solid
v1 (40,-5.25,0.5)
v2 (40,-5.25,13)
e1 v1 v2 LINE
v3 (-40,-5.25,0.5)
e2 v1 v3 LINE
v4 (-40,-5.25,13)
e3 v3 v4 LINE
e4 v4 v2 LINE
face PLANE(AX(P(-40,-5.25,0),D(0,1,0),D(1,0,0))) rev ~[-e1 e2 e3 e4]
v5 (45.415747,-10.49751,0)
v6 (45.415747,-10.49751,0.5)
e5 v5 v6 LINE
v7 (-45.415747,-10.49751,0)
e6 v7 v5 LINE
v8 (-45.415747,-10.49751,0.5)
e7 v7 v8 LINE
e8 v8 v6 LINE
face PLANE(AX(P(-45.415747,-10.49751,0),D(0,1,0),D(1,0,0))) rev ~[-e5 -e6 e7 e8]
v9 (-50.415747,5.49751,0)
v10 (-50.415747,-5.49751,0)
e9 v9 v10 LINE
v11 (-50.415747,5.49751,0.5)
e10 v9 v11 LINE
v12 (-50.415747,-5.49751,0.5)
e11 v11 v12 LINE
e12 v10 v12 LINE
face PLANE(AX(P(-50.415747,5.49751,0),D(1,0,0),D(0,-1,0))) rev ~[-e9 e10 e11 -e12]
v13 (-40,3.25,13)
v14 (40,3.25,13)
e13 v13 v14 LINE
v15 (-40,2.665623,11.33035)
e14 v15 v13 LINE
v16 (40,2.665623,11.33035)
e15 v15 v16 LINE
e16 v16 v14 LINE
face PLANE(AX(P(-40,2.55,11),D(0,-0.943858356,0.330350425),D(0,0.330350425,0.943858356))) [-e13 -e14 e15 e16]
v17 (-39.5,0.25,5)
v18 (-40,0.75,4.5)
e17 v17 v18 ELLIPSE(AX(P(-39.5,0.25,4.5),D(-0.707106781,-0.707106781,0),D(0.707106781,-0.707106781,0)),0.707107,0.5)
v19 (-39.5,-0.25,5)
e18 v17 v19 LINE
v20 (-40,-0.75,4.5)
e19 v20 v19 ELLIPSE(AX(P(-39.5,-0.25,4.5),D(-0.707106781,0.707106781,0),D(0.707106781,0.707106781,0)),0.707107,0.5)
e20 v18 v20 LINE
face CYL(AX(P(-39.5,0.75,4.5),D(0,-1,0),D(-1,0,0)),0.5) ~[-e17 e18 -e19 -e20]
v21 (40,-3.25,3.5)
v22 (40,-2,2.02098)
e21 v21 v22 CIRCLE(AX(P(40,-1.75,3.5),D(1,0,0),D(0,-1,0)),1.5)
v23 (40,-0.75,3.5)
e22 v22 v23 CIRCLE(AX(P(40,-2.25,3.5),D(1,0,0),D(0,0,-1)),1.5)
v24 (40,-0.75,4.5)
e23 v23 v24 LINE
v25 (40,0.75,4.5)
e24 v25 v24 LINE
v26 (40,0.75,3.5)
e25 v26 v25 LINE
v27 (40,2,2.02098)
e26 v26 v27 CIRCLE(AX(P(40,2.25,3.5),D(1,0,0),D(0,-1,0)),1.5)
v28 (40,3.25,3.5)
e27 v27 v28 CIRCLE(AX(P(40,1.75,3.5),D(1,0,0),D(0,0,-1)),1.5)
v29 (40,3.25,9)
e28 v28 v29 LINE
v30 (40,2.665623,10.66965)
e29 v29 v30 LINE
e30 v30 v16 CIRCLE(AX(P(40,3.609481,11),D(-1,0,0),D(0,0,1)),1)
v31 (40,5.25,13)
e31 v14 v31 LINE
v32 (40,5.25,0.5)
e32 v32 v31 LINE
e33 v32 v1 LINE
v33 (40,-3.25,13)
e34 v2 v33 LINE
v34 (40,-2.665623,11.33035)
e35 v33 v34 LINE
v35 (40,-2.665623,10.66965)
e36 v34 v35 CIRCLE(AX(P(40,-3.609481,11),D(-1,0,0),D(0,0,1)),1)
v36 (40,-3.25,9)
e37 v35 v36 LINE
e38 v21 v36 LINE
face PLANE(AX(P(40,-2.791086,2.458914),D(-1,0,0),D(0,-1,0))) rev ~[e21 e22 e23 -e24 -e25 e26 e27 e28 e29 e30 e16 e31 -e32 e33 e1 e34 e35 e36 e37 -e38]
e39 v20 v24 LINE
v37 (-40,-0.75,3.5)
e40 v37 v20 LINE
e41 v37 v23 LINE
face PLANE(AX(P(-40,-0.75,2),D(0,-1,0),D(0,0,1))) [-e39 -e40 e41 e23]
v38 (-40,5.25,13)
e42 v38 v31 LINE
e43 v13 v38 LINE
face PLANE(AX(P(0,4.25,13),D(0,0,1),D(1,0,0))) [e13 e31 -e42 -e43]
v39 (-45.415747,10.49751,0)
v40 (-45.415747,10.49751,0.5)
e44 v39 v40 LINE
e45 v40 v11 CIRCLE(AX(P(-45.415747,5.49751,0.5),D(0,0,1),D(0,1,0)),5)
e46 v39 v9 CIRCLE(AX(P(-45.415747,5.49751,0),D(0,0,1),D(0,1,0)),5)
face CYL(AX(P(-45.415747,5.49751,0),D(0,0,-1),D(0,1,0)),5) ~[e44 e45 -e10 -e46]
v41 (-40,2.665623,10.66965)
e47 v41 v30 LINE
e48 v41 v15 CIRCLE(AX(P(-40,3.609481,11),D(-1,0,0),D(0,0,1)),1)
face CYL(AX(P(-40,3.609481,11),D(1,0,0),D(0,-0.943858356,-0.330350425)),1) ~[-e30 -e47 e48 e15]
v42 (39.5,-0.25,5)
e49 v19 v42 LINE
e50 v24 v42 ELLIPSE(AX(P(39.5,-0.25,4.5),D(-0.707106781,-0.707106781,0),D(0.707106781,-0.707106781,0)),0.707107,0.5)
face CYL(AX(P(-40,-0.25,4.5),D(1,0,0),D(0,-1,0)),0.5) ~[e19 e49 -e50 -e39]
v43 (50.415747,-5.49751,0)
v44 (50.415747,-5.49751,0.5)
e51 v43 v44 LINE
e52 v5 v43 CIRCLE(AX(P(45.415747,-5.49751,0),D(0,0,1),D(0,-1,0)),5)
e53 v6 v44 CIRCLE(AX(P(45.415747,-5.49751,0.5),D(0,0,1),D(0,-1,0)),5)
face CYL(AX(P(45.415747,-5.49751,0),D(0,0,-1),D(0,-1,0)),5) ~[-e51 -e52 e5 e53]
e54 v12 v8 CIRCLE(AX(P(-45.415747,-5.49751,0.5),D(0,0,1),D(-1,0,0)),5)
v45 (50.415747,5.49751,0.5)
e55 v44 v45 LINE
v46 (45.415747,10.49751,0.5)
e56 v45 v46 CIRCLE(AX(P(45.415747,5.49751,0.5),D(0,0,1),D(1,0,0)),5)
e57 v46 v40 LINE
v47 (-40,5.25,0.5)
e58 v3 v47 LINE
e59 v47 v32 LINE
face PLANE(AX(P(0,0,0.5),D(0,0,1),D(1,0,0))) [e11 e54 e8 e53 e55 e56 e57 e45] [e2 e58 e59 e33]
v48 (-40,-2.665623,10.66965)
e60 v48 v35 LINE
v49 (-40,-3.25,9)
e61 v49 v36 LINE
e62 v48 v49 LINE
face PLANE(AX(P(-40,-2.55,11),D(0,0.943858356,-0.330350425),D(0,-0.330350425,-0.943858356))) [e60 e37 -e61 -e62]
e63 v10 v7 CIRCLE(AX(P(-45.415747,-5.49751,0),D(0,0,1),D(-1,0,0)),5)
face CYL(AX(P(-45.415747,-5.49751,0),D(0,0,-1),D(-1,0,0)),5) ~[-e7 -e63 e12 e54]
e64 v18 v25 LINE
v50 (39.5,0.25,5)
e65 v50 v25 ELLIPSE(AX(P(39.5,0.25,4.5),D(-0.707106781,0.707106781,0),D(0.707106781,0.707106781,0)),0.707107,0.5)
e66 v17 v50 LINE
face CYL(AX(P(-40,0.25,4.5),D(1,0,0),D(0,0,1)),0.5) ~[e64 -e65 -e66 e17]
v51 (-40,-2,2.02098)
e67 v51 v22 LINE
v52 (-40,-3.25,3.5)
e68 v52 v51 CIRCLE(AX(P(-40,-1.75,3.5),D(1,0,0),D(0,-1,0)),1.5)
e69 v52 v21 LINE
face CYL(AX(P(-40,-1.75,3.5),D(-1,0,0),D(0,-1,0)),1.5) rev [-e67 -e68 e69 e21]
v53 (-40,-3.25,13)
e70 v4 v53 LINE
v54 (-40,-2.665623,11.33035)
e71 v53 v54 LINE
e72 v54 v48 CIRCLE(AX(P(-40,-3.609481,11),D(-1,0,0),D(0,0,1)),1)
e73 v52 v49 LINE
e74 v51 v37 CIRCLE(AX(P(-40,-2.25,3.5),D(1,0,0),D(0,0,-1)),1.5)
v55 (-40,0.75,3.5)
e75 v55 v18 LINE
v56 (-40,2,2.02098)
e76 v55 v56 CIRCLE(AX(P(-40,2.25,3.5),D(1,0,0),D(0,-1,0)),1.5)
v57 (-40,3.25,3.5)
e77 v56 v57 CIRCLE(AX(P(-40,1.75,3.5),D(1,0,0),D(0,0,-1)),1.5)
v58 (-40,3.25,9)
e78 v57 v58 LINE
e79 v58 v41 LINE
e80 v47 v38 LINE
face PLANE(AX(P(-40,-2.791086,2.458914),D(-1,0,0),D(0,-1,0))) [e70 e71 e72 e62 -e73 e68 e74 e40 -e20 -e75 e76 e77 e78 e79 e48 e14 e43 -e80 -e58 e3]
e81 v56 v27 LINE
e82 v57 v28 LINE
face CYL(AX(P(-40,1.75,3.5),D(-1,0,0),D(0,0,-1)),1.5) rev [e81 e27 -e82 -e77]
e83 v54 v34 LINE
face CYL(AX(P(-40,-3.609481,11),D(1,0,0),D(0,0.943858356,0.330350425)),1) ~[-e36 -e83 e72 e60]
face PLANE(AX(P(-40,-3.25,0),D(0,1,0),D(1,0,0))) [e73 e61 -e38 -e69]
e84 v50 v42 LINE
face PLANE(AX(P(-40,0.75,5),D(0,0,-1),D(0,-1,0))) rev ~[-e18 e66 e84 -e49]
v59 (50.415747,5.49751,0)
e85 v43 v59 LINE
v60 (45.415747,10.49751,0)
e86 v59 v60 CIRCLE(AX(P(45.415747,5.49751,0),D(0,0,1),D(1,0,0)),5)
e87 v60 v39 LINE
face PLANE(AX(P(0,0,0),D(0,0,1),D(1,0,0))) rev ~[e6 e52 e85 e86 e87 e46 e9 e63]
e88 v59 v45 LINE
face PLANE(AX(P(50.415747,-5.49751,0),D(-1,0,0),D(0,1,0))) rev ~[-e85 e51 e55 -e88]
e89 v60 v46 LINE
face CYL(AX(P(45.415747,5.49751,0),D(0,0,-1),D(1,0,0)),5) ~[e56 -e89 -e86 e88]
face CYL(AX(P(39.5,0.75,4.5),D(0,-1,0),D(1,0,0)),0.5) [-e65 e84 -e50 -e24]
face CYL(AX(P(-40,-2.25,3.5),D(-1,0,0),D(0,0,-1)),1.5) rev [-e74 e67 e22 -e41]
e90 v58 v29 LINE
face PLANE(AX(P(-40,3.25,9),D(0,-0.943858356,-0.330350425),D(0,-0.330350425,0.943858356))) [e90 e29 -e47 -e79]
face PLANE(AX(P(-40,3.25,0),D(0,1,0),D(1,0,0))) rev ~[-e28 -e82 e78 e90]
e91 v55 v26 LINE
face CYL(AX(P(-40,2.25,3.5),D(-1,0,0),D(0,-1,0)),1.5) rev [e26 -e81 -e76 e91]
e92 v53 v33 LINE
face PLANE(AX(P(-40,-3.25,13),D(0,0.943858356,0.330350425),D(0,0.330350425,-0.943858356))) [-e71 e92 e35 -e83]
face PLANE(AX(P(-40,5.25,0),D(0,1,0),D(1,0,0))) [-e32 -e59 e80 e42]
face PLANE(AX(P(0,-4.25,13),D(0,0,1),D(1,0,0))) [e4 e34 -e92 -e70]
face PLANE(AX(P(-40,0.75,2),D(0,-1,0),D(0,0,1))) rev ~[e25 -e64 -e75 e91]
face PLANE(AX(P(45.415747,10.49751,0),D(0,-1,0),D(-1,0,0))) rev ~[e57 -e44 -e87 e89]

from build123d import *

# Parameters (mm, degrees)
F0_W        = 80
F0_H        = 6.5
F1_DEPTH    = 2
F0_H_2      = 2
F2_DEPTH    = 13
F3_W        = 1.5
F3_H        = 3
F4_DEPTH    = 80
F5_R        = 1
F6_R        = 1
F7_T1_DEPTH = 80
F8_R        = 0.5
F9_DEPTH    = 0.5


# Not quite as in the source:
# - a fillet or chamfer that OpenCascade refuses, or shapes differently, is made with other operations: its cross-section is extruded or revolved along the edge and cut away or added
# - a feature names something its author has since deleted; it is built from what else it names


with BuildPart() as f1:
    # F0 (on Top) → F1 (new body)
    with BuildSketch(Plane.XY):
        Rectangle(F0_W, F0_H)
    extrude(amount=F1_DEPTH)

    # F0 (on Top) → F2 (join)
    with BuildSketch(Plane.XY):
        with Locations((0, 4.25)):
            Rectangle(F0_W, F0_H_2)
        with Locations((0, -4.25)):
            Rectangle(F0_W, F0_H_2)
    extrude(amount=F2_DEPTH)

    # F3 (on face) → F4 (join)
    with BuildSketch(Plane(origin=(-40, 0, 0), x_dir=(0, -1, 0), z_dir=(-1, 0, 0))):
        Polygon((-3.25, 13), (-3.25, 9), (-2.55, 11), align=None)
        Polygon((2.55, 11), (3.25, 9), (3.25, 13), align=None)
        with Locations((0, 3.5)):
            Rectangle(F3_W, F3_H)
    extrude(amount=-F4_DEPTH)

    # F5
    f5_edges = [f1.edges().sort_by_distance(p)[0] for p in [
        (0, 2.55, 11),
    ]]
    fillet(f5_edges, radius=F5_R)

    # F6
    f6_edges = [f1.edges().sort_by_distance(p)[0] for p in [
        (0, -2.55, 11),
    ]]
    fillet(f6_edges, radius=F6_R)

    # F7: fillet of radius 1.5 on 4 edges, made by hand

    # F7_s2 → F7_t1 (join)
    with BuildSketch(Plane.YZ.offset(-40)):
        with BuildLine():
            ThreePointArc((-3.25, 3.5), (-2.8106601718, 2.4393398282), (-1.75, 2))
            Line((-1.75, 2), (-3.25, 2))
            Line((-3.25, 2), (-3.25, 3.5))
        make_face()
        with BuildLine():
            ThreePointArc((1.75, 2), (2.8106601718, 2.4393398282), (3.25, 3.5))
            Line((3.25, 3.5), (3.25, 2))
            Line((3.25, 2), (1.75, 2))
        make_face()
        with BuildLine():
            ThreePointArc((-2.25, 2), (-1.1893398282, 2.4393398282), (-0.75, 3.5))
            Line((-0.75, 3.5), (-0.75, 2))
            Line((-0.75, 2), (-2.25, 2))
        make_face()
        with BuildLine():
            ThreePointArc((0.75, 3.5), (1.1893398282, 2.4393398282), (2.25, 2))
            Line((2.25, 2), (0.75, 2))
            Line((0.75, 2), (0.75, 3.5))
        make_face()
    extrude(amount=F7_T1_DEPTH)

    # F8
    f8_edges = [f1.edges().sort_by_distance(p)[0] for p in [
        (0, -0.75, 5),
        (0, 0.75, 5),
        (-40, 0, 5),
        (40, 0, 5),
    ]]
    fillet(f8_edges, radius=F8_R)

    # F0 (on Top) → F9 (join)
    with BuildSketch(Plane.XY):
        with BuildLine():
            ThreePointArc((50.4157468677, 5.4975104332), (48.9512807736, 9.0330443391), (45.4157468677, 10.4975104332))
            Line((45.4157468677, 10.4975104332), (-45.4157468677, 10.4975104332))
            ThreePointArc((-45.4157468677, 10.4975104332), (-48.9512807736, 9.0330443391), (-50.4157468677, 5.4975104332))
            Line((-50.4157468677, 5.4975104332), (-50.4157468677, -5.4975104332))
            ThreePointArc((-50.4157468677, -5.4975104332), (-48.9512807736, -9.0330443391), (-45.4157468677, -10.4975104332))
            Line((-45.4157468677, -10.4975104332), (45.4157468677, -10.4975104332))
            ThreePointArc((45.4157468677, -10.4975104332), (48.9512807736, -9.0330443391), (50.4157468677, -5.4975104332))
            Line((50.4157468677, -5.4975104332), (50.4157468677, 5.4975104332))
        make_face()
        Polygon((-40, 5.25), (40, 5.25), (40, 3.25), (40, -3.25), (40, -5.25), (-40, -5.25), (-40, -3.25), (-40, 3.25), align=None, mode=Mode.SUBTRACT)
    extrude(amount=F9_DEPTH)


solid = f1.part
